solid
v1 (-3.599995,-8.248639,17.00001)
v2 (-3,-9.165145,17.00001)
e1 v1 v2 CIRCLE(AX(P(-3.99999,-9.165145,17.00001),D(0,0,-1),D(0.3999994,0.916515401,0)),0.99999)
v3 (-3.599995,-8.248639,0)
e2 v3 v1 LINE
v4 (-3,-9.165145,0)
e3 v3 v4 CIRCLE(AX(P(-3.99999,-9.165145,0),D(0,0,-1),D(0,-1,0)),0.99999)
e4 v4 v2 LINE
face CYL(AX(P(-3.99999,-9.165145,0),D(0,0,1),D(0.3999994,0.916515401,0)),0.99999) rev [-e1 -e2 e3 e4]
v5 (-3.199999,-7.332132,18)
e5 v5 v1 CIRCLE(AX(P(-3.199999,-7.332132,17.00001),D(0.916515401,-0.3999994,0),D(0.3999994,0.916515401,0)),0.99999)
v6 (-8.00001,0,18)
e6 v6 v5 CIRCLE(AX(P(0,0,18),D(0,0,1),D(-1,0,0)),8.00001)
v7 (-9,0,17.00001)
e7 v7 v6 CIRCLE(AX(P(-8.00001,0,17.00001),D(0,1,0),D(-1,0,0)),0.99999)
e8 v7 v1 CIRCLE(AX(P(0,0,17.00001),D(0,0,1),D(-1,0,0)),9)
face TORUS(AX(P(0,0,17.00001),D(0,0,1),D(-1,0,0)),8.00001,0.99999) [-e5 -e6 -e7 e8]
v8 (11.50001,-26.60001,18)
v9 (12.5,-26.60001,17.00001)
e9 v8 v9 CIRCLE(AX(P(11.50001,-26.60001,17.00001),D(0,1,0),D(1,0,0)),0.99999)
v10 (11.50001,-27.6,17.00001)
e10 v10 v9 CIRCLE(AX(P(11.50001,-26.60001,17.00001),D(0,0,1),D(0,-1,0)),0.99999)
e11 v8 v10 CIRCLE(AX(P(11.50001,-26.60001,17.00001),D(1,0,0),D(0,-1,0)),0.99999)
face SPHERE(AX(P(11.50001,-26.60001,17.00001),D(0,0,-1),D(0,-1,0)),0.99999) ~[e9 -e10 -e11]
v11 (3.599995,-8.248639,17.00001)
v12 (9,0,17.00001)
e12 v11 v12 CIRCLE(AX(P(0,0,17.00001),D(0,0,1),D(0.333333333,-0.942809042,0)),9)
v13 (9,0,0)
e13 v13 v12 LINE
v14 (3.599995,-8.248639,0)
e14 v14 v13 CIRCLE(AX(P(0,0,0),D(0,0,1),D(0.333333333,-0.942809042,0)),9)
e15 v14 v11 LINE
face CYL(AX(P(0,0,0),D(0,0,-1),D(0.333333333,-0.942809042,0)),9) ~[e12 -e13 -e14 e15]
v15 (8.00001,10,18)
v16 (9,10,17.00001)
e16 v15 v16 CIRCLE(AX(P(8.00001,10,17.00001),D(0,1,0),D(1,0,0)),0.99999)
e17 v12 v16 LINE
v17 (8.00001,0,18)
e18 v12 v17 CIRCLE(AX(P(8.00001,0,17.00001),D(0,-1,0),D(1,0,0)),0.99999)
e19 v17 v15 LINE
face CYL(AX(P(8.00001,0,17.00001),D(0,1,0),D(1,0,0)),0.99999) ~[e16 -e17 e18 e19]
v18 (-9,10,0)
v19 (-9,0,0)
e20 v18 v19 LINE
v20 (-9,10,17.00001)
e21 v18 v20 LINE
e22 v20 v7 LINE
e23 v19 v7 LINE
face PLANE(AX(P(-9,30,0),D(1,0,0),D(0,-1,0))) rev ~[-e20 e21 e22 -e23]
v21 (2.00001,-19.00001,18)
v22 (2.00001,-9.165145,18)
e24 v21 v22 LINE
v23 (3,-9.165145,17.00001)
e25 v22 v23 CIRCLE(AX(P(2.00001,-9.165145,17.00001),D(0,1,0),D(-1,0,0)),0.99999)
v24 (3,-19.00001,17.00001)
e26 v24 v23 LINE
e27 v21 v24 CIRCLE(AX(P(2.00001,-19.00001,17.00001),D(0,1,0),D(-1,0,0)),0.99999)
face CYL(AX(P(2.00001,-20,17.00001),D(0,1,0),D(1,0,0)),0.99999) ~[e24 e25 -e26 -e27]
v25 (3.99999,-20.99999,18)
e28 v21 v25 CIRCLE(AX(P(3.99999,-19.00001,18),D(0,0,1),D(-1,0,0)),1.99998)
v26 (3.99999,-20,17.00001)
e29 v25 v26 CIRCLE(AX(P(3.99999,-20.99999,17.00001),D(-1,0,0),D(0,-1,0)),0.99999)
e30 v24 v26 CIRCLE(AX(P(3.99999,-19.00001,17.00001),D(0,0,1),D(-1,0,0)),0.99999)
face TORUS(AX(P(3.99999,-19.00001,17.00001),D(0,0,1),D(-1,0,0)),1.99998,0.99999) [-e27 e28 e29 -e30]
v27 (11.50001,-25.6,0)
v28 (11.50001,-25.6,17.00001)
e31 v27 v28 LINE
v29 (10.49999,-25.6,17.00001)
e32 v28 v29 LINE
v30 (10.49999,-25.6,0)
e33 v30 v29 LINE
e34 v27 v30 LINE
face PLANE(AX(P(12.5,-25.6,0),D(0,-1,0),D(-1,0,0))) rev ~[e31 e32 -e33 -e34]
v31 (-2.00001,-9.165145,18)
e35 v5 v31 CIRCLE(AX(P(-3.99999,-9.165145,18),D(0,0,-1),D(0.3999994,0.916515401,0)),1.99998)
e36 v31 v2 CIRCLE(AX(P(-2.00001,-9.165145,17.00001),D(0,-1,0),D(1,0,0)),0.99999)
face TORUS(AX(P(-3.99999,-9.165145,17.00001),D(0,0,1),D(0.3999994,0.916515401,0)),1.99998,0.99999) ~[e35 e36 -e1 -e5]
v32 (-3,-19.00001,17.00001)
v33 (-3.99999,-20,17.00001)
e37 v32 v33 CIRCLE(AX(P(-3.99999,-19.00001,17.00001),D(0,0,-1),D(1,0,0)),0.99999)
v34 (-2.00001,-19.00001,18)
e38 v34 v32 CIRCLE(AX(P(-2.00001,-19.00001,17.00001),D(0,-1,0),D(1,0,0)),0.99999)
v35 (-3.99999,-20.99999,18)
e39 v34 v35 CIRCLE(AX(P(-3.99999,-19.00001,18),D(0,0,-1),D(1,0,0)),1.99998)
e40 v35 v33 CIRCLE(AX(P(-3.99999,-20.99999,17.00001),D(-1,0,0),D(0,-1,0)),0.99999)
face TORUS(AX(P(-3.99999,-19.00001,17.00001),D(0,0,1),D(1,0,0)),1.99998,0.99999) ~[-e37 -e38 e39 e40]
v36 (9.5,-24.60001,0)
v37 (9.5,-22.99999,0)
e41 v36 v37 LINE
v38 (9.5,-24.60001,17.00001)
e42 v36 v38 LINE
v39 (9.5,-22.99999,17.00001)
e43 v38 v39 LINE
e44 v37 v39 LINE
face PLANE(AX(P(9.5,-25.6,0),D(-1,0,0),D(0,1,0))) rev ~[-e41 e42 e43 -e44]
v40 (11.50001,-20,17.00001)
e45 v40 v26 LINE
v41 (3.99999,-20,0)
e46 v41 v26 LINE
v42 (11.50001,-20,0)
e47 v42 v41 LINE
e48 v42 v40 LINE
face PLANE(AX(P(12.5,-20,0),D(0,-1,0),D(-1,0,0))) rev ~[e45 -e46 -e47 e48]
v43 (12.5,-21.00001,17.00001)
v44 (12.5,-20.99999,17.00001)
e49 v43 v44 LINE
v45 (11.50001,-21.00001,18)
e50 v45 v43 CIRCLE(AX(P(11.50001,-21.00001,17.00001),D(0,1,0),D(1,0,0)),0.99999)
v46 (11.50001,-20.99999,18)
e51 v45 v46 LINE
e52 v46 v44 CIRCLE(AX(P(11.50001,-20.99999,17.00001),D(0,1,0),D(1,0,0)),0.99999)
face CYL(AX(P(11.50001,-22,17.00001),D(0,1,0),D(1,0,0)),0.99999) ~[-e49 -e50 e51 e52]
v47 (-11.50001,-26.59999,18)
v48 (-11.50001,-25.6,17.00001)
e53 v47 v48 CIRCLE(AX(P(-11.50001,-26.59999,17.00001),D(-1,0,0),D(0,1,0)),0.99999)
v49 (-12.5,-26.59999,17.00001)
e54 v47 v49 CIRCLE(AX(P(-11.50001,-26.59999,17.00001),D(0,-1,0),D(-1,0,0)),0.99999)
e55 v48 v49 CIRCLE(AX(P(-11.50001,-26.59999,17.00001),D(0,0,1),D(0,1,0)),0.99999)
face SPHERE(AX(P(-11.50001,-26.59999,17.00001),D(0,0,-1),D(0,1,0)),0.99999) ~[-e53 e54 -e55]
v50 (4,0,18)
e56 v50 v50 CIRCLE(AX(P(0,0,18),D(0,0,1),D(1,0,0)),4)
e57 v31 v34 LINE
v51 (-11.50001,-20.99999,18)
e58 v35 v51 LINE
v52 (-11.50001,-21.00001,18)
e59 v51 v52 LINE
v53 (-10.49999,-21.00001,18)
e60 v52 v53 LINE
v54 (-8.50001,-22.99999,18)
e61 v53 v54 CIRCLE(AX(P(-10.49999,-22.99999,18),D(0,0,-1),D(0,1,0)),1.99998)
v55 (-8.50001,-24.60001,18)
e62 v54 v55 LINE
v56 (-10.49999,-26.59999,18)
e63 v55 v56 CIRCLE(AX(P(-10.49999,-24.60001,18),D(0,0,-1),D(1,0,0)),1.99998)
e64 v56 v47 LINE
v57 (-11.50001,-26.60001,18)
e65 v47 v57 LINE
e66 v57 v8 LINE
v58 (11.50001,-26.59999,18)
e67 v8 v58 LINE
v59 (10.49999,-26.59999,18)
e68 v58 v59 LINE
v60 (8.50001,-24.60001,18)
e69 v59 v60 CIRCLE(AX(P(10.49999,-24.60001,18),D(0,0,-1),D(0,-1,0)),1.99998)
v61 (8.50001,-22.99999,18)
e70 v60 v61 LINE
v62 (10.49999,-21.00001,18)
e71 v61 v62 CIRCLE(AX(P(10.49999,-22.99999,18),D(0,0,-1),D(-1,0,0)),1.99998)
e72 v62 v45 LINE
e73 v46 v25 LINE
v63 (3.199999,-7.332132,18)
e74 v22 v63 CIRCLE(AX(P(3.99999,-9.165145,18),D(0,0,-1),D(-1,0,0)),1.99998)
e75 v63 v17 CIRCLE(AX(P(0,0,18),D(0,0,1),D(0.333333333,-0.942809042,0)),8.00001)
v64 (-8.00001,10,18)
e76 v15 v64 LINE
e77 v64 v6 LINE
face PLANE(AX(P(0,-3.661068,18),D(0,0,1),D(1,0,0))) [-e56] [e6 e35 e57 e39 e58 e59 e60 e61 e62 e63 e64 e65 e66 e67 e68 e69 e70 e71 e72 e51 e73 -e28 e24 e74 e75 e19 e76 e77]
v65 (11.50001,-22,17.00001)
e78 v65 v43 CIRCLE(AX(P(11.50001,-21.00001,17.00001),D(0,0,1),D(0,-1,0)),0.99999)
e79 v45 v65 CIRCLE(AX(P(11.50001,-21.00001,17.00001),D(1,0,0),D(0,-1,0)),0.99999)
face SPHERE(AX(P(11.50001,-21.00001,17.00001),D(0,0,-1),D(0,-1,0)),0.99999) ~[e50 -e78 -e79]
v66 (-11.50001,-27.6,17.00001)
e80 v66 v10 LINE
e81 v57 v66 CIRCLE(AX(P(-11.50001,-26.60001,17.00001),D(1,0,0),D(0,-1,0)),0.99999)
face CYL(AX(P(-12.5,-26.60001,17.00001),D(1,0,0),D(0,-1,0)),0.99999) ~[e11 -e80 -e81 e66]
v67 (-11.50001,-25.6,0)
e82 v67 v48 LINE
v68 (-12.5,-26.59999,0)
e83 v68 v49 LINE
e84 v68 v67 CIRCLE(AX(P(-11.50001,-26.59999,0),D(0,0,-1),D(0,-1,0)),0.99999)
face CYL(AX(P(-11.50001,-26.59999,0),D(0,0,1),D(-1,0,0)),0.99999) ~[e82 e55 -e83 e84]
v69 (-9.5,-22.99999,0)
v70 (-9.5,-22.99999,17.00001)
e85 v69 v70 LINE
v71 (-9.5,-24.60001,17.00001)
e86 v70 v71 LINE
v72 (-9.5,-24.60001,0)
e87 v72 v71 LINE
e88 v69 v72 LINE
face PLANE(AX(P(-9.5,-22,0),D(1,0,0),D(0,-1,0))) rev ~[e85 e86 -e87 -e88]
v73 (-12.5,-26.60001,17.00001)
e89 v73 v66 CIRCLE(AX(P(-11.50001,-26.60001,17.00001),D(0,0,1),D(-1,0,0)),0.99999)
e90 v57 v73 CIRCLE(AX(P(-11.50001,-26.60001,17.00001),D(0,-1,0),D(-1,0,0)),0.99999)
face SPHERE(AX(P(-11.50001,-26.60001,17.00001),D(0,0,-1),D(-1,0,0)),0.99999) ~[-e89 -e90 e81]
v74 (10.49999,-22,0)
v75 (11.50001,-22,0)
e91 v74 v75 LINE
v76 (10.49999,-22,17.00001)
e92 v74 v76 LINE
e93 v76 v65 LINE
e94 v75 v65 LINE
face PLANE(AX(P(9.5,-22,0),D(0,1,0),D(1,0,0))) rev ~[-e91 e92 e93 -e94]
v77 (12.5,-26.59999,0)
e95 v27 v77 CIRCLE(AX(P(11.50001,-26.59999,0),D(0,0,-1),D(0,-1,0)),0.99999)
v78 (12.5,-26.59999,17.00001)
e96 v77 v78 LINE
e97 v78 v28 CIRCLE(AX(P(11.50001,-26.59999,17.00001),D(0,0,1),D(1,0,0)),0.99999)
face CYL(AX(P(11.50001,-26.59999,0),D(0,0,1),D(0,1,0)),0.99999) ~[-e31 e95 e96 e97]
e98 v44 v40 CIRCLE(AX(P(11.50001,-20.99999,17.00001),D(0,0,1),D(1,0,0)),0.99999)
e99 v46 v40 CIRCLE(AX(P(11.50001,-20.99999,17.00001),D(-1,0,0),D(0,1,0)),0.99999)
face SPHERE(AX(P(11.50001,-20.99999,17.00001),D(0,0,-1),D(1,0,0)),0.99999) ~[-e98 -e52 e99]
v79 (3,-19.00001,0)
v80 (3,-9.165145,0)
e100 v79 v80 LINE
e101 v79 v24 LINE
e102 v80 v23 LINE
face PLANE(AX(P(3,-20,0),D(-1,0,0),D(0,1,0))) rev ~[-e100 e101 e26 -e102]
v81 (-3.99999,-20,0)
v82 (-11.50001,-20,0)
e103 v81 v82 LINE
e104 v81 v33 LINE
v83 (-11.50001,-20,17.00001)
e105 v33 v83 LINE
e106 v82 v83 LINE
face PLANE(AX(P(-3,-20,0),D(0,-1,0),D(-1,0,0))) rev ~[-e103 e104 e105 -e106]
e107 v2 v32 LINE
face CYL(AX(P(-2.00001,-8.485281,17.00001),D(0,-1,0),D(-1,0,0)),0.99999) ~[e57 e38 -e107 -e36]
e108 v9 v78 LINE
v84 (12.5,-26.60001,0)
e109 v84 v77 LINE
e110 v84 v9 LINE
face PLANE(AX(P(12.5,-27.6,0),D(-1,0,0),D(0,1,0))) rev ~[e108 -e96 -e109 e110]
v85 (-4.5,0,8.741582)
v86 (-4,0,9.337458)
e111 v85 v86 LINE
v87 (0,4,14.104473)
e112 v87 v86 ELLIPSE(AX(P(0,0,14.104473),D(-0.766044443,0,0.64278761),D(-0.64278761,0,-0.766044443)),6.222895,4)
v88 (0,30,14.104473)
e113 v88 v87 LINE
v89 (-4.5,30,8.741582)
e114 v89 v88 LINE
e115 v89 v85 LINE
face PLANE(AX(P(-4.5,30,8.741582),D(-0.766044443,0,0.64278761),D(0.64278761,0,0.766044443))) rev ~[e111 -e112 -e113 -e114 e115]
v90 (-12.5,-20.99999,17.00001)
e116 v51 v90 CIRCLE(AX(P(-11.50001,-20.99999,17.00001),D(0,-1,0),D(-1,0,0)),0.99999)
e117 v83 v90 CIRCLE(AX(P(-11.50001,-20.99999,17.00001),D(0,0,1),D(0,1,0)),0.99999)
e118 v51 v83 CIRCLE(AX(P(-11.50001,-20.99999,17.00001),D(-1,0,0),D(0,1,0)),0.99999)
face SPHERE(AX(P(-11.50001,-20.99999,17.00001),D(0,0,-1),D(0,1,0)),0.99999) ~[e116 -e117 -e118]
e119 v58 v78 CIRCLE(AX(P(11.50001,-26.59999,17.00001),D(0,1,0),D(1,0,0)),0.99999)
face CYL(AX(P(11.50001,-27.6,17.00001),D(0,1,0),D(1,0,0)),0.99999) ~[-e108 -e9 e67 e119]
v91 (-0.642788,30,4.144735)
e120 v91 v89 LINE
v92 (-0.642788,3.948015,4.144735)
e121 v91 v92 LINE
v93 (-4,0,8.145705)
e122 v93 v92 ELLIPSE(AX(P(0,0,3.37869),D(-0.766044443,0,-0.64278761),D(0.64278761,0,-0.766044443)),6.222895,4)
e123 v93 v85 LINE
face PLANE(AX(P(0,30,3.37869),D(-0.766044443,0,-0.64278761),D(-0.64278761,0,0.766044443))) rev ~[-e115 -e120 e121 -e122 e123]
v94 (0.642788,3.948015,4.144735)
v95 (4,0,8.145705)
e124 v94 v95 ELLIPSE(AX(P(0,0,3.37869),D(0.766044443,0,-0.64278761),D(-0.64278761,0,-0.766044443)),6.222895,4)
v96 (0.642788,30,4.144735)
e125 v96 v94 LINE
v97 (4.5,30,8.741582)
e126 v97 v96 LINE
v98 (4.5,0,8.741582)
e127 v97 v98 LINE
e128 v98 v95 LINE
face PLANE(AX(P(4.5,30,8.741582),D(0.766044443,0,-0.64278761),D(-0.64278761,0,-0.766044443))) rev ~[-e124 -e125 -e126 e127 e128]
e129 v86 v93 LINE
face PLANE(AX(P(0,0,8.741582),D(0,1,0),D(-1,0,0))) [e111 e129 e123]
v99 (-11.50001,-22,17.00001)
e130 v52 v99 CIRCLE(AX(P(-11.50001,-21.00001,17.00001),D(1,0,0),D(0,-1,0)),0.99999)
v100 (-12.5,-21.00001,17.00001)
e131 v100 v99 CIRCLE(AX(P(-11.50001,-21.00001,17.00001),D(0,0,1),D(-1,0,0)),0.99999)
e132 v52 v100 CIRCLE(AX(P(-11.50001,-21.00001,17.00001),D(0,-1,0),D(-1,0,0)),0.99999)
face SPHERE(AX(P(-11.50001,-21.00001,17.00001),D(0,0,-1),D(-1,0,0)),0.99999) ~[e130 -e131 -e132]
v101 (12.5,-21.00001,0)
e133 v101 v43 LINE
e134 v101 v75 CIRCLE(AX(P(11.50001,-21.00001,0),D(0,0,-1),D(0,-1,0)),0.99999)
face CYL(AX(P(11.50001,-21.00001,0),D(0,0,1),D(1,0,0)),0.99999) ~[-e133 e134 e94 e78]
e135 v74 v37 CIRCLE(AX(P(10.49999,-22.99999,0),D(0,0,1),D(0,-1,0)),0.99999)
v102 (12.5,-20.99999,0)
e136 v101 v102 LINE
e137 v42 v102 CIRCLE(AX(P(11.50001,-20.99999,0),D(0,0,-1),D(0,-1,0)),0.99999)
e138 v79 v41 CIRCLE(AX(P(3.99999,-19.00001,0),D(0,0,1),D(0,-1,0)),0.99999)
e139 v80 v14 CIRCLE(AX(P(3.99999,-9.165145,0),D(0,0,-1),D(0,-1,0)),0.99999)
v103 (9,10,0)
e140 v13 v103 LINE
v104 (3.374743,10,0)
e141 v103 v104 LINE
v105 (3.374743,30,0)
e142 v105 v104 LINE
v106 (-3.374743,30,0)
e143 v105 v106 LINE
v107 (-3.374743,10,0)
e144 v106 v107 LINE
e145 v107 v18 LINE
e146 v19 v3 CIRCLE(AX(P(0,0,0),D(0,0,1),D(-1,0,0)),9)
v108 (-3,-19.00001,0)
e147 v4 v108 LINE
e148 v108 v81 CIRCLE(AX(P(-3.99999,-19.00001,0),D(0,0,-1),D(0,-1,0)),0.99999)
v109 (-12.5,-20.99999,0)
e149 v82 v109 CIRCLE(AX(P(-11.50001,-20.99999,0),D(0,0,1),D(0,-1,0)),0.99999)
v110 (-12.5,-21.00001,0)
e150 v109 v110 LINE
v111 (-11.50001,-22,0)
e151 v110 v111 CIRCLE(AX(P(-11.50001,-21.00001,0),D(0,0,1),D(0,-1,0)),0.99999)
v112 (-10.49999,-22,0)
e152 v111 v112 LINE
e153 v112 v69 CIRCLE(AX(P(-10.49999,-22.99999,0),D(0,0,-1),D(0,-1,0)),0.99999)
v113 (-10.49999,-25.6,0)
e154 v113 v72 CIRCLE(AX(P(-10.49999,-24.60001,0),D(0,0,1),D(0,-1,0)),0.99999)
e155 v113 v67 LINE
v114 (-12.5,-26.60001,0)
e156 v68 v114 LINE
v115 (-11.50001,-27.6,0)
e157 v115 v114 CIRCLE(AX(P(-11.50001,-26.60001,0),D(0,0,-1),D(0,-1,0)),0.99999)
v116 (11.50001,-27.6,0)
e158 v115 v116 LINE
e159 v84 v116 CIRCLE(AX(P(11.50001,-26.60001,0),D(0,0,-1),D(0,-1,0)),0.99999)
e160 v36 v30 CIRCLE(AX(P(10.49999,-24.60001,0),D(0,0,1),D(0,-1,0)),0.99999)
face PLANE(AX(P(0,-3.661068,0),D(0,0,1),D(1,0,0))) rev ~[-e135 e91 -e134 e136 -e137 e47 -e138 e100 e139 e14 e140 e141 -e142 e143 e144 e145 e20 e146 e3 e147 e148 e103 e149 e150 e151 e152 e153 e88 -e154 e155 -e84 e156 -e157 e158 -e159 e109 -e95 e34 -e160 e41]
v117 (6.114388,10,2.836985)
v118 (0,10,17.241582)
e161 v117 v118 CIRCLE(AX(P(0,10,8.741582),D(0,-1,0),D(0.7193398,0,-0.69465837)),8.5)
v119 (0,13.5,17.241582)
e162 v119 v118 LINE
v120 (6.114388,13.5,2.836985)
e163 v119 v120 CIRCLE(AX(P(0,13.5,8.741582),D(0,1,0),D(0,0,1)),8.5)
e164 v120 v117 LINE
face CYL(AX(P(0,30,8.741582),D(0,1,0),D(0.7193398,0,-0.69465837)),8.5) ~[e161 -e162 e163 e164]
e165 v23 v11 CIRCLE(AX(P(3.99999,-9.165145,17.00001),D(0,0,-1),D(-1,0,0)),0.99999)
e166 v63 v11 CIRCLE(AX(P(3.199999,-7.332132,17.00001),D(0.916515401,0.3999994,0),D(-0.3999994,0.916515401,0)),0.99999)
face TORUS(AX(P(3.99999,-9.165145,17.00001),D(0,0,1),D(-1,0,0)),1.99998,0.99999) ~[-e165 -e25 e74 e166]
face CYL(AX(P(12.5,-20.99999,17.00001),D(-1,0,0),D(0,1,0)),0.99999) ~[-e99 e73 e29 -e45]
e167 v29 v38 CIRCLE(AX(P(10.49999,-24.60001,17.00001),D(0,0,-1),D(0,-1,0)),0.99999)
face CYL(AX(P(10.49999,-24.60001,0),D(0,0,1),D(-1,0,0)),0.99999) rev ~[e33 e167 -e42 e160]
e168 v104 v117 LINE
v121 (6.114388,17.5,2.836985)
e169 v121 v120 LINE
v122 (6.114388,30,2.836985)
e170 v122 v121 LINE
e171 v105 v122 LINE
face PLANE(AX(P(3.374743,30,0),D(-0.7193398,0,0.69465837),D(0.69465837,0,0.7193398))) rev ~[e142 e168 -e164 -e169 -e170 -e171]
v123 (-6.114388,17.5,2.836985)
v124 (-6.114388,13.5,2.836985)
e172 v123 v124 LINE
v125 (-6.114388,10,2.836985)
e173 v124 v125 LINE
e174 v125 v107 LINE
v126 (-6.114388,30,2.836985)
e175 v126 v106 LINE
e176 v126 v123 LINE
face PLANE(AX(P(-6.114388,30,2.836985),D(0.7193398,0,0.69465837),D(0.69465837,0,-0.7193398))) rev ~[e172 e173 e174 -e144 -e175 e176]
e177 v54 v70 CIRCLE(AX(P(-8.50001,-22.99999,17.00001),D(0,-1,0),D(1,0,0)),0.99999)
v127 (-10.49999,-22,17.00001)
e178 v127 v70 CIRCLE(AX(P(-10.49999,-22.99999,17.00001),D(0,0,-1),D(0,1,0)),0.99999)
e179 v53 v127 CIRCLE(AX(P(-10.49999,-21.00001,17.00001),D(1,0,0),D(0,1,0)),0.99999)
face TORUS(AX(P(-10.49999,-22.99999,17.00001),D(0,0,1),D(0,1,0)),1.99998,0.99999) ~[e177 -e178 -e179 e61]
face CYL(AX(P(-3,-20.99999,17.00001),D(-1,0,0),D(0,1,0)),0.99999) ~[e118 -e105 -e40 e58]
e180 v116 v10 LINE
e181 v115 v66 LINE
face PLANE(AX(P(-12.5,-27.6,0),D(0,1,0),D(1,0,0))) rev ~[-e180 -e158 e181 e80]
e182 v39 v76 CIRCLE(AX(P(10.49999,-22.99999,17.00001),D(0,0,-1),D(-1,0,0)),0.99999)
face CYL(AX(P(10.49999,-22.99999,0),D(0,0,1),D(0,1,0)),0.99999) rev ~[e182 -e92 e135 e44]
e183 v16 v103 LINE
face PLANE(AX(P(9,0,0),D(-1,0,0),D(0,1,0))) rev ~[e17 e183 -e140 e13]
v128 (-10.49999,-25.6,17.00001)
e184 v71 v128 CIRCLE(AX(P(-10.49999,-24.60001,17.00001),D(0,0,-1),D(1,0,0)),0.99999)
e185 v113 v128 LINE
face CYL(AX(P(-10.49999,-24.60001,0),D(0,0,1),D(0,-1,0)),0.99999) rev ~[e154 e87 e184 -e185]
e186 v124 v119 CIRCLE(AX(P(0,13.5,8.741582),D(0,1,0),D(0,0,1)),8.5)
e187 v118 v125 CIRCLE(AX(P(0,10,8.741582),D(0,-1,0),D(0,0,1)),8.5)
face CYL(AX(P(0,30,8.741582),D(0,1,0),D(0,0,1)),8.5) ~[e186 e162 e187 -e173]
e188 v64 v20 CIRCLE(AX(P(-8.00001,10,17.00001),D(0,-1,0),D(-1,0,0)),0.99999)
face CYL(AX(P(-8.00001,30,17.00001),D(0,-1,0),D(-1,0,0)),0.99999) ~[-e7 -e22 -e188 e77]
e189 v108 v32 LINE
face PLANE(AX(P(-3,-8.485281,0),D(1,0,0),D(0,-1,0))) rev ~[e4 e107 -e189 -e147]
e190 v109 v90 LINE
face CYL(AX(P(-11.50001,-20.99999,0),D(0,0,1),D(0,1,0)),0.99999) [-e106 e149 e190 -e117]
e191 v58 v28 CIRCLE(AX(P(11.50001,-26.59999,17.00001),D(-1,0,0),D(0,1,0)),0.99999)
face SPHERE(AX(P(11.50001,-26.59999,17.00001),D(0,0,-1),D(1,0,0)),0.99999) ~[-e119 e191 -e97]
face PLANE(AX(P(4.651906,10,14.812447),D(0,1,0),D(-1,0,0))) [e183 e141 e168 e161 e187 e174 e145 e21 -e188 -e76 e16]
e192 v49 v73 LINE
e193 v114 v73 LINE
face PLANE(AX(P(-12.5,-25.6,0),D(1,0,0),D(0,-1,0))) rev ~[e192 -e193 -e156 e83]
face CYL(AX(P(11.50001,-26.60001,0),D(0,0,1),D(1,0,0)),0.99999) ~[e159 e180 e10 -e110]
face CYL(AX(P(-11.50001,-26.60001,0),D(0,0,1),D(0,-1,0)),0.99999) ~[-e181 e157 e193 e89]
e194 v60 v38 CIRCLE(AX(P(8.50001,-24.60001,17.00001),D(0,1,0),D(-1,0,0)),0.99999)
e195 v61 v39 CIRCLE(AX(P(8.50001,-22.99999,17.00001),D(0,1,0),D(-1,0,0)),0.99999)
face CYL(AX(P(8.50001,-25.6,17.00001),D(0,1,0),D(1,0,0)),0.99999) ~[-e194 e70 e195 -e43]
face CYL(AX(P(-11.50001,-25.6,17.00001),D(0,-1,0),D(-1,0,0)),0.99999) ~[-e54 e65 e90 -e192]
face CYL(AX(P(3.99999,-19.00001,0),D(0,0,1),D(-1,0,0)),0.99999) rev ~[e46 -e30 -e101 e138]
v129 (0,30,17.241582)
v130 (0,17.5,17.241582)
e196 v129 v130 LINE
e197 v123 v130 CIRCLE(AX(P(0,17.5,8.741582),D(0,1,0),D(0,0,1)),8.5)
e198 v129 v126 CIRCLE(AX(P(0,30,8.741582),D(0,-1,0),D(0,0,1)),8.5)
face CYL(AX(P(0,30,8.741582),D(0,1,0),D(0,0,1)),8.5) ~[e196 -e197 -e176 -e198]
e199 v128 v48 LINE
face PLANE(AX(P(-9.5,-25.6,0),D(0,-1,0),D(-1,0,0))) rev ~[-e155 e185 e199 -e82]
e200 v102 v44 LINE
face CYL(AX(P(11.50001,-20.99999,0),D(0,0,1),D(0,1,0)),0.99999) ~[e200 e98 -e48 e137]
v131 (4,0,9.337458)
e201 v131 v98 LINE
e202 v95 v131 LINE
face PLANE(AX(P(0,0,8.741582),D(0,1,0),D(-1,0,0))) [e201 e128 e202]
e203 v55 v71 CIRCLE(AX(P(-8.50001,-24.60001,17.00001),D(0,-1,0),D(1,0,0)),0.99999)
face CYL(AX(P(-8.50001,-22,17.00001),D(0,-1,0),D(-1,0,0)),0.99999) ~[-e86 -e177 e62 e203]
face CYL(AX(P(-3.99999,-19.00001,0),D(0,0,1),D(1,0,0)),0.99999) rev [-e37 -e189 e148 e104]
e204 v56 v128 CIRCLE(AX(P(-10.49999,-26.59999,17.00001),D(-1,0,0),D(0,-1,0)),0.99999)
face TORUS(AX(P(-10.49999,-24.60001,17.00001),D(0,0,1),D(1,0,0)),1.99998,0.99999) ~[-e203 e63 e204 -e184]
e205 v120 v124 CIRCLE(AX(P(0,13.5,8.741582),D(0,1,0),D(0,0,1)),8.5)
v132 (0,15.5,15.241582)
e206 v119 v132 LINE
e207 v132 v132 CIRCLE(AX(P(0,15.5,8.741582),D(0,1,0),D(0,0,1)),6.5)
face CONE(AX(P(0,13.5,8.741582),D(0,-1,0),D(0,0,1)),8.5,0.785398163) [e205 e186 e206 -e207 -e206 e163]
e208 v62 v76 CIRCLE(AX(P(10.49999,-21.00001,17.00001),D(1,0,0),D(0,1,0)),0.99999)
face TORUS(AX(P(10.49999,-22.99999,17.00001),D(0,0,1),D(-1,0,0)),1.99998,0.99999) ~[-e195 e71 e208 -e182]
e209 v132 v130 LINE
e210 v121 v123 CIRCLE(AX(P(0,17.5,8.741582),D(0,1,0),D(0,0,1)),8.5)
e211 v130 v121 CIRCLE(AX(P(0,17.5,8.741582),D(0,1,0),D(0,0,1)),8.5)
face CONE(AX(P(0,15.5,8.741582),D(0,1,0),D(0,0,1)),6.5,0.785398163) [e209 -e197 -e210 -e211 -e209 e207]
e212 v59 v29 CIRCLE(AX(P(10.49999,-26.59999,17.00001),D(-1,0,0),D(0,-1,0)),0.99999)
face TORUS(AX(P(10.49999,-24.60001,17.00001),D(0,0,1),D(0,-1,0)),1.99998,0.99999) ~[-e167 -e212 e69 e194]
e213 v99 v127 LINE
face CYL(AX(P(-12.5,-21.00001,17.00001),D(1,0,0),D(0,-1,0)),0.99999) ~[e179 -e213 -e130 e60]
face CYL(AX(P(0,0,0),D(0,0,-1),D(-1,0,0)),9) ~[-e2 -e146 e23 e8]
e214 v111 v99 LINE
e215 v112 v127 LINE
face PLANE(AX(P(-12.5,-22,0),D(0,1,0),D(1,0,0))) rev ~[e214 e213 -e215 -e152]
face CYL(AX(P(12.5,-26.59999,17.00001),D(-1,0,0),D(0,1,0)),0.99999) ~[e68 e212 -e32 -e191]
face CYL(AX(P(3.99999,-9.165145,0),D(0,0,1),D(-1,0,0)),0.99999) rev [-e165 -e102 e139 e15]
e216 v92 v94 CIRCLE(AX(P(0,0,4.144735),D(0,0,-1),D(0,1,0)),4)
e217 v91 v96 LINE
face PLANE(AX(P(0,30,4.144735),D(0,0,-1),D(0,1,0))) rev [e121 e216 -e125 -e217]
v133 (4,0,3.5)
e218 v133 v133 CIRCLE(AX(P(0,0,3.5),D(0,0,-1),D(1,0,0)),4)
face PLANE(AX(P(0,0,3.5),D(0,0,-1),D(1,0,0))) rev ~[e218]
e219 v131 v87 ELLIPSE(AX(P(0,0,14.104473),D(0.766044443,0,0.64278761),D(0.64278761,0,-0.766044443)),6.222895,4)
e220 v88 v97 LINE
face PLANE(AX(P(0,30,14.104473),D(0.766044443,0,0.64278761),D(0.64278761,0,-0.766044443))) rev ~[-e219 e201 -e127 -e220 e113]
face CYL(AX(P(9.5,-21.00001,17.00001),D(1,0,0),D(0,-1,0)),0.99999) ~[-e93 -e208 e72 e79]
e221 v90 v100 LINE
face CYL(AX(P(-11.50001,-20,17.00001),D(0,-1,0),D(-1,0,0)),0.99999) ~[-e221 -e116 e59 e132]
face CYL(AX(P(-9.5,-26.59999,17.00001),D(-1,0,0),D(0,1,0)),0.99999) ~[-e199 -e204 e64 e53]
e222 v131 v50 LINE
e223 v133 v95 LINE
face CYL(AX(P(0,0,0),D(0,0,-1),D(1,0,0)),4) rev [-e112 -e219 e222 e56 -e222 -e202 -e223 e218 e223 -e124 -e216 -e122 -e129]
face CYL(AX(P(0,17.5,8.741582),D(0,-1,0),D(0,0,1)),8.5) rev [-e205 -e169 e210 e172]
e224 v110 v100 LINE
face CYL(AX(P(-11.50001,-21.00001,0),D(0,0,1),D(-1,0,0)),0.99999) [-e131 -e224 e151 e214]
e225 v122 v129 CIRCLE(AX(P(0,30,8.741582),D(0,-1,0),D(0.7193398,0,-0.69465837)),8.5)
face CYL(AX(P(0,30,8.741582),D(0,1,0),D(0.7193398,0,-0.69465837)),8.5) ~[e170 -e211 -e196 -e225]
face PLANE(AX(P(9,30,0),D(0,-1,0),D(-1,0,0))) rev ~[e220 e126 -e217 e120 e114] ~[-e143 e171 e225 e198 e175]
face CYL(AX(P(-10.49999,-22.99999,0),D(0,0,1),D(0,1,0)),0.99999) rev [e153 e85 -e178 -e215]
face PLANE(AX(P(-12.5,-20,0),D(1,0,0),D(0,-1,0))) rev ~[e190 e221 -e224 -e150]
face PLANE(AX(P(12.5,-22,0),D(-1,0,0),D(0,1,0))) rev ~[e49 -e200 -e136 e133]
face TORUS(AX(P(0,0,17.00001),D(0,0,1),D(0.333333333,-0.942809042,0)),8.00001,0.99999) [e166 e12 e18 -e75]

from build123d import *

# Parameters (mm, degrees)
F0_R      = 4
F1_DEPTH  = 18
F3_R      = 0.99999
F6_DEPTH  = 20
F8_DEPTH  = 30
F9_SIZE   = 1
F10_R     = 5
F11_DEPTH = 3.5


# Not quite as in the source:
# - two fillets or chamfers of one size are made in one step
# - a fillet or chamfer is up to 0.001 mm smaller than in the source, because OpenCascade refuses the exact size


with BuildPart() as f1:
    # F0 (on Top) → F1 (new body)
    with BuildSketch(Plane.XY):
        with BuildLine():
            Line((3, -20), (3, -8.4852813742))
            ThreePointArc((3, -8.4852813742), (7.3484692283, -5.1961524227), (9, 0))
            Line((9, 0), (9, 30))
            Line((9, 30), (-9, 30))
            Line((-9, 30), (-9, 0))
            ThreePointArc((-9, 0), (-7.3484692283, -5.1961524227), (-3, -8.4852813742))
            Line((-3, -8.4852813742), (-3, -20))
            Line((-3, -20), (-12.5, -20))
            Line((-12.5, -20), (-12.5, -22))
            Line((-12.5, -22), (-9.5, -22))
            Line((-9.5, -22), (-9.5, -25.6))
            Line((-9.5, -25.6), (-12.5, -25.6))
            Line((-12.5, -25.6), (-12.5, -27.6))
            Line((-12.5, -27.6), (0, -27.6))
            Line((0, -27.6), (12.5, -27.6))
            Line((12.5, -27.6), (12.5, -25.6))
            Line((12.5, -25.6), (9.5, -25.6))
            Line((9.5, -25.6), (9.5, -22))
            Line((9.5, -22), (12.5, -22))
            Line((12.5, -22), (12.5, -20))
            Line((12.5, -20), (3, -20))
        make_face()
        Circle(F0_R, mode=Mode.SUBTRACT)
    extrude(amount=F1_DEPTH)

    # F3 (radius 1 in the source; OpenCascade refuses exactly that, so slightly less here)
    f3_edges = [f1.edges().sort_by_distance(p)[0] for p in [
        (3, -20, 9),
        (-3, -20, 9),
        (3, -8.485281, 9),
        (12.5, -27.6, 9),
        (-12.5, -27.6, 9),
        (-9.5, -25.6, 9),
        (-12.5, -25.6, 9),
        (-9.5, -22, 9),
        (-12.5, -22, 9),
        (-12.5, -20, 9),
        (12.5, -25.6, 9),
        (9.5, -25.6, 9),
        (9.5, -22, 9),
        (12.5, -22, 9),
        (12.5, -20, 9),
        (3, -14.242641, 18),
        (7.348469, -5.196152, 18),
        (9, 15, 18),
        (-9, 15, 18),
        (-7.348469, -5.196152, 18),
        (-3, -14.242641, 18),
        (-7.75, -20, 18),
        (-12.5, -21, 18),
        (-11, -22, 18),
        (-9.5, -23.8, 18),
        (-11, -25.6, 18),
        (-12.5, -26.6, 18),
        (0, -27.6, 18),
        (12.5, -26.6, 18),
        (11, -25.6, 18),
        (9.5, -23.8, 18),
        (11, -22, 18),
        (12.5, -21, 18),
        (7.75, -20, 18),
        (-3, -8.485281, 9),
    ]]
    fillet(f3_edges, radius=F3_R)

    # F5 (on face) → F6 (cut)
    with BuildSketch(Plane(origin=(0, 30, 0), x_dir=(-1, 0, 0), z_dir=(0, 1, 0))):
        with BuildLine():
            Line((-11.1393053085, 0), (-9, 0))
            Line((-9, 0), (-9, 17.00001))
            ThreePointArc((-9, 17.00001), (-8.7071097101, 17.7071097101), (-8.00001, 18))
            Line((-8.00001, 18), (8.00001, 18))
            ThreePointArc((8.00001, 18), (8.7071097101, 17.7071097101), (9, 17.00001))
            Line((9, 17.00001), (9, 21.8532588333))
            Line((9, 21.8532588333), (-11.1393053085, 21.8532588333))
            Line((-11.1393053085, 21.8532588333), (-11.1393053085, 0))
        make_face()
        with BuildLine():
            Line((6.1143883029, 2.836985475), (3.3747432753, 0))
            Line((3.3747432753, 0), (9, 0))
            Line((9, 0), (9, 17.00001))
            ThreePointArc((9, 17.00001), (8.7071097101, 17.7071097101), (8.00001, 18))
            Line((8.00001, 18), (-8.00001, 18))
            ThreePointArc((-8.00001, 18), (-8.7071097101, 17.7071097101), (-9, 17.00001))
            Line((-9, 17.00001), (-9, 0))
            Line((-9, 0), (-3.3747432753, 0))
            Line((-3.3747432753, 0), (-6.1143883029, 2.836985475))
            ThreePointArc((-6.1143883029, 2.836985475), (-7.8242912543, 12.0627962161), (0, 17.2415816239))
            ThreePointArc((0, 17.2415816239), (7.8242912543, 12.0627962161), (6.1143883029, 2.836985475))
        make_face()
    extrude(amount=-F6_DEPTH, mode=Mode.SUBTRACT)

    # F7 (on face) → F8 (cut)
    with BuildSketch(Plane(origin=(0, 30, 0), x_dir=(-1, 0, 0), z_dir=(0, 1, 0))):
        Polygon((4.5, 8.7415816239), (0, 14.1044727906), (-4.5, 8.7415816239), (0, 3.3786904573), align=None)
    extrude(amount=-F8_DEPTH, mode=Mode.SUBTRACT)

    # F9
    f9_edges = [f1.edges().sort_by_distance(p)[0] for p in [
        (0, 17, 3.37869),
    ]]
    chamfer(f9_edges, length=F9_SIZE)

    # F10 (on face) → F11 (join)
    with BuildSketch(Plane(origin=(0, 0, 0), x_dir=(1, 0, 0), z_dir=(0, 0, -1))):
        Circle(F10_R)
    extrude(amount=-F11_DEPTH)

    # F12 (on Right) → F13 (revolve, cut)
    with BuildSketch(Plane.YZ):
        Polygon((17.5, 17.2415816239), (13.5, 17.2415816239), (15.5, 15.2415816239), align=None)
    revolve(axis=Axis((0, 30, 8.7415816239), (0, 1, 0)), mode=Mode.SUBTRACT)


solid = f1.part
